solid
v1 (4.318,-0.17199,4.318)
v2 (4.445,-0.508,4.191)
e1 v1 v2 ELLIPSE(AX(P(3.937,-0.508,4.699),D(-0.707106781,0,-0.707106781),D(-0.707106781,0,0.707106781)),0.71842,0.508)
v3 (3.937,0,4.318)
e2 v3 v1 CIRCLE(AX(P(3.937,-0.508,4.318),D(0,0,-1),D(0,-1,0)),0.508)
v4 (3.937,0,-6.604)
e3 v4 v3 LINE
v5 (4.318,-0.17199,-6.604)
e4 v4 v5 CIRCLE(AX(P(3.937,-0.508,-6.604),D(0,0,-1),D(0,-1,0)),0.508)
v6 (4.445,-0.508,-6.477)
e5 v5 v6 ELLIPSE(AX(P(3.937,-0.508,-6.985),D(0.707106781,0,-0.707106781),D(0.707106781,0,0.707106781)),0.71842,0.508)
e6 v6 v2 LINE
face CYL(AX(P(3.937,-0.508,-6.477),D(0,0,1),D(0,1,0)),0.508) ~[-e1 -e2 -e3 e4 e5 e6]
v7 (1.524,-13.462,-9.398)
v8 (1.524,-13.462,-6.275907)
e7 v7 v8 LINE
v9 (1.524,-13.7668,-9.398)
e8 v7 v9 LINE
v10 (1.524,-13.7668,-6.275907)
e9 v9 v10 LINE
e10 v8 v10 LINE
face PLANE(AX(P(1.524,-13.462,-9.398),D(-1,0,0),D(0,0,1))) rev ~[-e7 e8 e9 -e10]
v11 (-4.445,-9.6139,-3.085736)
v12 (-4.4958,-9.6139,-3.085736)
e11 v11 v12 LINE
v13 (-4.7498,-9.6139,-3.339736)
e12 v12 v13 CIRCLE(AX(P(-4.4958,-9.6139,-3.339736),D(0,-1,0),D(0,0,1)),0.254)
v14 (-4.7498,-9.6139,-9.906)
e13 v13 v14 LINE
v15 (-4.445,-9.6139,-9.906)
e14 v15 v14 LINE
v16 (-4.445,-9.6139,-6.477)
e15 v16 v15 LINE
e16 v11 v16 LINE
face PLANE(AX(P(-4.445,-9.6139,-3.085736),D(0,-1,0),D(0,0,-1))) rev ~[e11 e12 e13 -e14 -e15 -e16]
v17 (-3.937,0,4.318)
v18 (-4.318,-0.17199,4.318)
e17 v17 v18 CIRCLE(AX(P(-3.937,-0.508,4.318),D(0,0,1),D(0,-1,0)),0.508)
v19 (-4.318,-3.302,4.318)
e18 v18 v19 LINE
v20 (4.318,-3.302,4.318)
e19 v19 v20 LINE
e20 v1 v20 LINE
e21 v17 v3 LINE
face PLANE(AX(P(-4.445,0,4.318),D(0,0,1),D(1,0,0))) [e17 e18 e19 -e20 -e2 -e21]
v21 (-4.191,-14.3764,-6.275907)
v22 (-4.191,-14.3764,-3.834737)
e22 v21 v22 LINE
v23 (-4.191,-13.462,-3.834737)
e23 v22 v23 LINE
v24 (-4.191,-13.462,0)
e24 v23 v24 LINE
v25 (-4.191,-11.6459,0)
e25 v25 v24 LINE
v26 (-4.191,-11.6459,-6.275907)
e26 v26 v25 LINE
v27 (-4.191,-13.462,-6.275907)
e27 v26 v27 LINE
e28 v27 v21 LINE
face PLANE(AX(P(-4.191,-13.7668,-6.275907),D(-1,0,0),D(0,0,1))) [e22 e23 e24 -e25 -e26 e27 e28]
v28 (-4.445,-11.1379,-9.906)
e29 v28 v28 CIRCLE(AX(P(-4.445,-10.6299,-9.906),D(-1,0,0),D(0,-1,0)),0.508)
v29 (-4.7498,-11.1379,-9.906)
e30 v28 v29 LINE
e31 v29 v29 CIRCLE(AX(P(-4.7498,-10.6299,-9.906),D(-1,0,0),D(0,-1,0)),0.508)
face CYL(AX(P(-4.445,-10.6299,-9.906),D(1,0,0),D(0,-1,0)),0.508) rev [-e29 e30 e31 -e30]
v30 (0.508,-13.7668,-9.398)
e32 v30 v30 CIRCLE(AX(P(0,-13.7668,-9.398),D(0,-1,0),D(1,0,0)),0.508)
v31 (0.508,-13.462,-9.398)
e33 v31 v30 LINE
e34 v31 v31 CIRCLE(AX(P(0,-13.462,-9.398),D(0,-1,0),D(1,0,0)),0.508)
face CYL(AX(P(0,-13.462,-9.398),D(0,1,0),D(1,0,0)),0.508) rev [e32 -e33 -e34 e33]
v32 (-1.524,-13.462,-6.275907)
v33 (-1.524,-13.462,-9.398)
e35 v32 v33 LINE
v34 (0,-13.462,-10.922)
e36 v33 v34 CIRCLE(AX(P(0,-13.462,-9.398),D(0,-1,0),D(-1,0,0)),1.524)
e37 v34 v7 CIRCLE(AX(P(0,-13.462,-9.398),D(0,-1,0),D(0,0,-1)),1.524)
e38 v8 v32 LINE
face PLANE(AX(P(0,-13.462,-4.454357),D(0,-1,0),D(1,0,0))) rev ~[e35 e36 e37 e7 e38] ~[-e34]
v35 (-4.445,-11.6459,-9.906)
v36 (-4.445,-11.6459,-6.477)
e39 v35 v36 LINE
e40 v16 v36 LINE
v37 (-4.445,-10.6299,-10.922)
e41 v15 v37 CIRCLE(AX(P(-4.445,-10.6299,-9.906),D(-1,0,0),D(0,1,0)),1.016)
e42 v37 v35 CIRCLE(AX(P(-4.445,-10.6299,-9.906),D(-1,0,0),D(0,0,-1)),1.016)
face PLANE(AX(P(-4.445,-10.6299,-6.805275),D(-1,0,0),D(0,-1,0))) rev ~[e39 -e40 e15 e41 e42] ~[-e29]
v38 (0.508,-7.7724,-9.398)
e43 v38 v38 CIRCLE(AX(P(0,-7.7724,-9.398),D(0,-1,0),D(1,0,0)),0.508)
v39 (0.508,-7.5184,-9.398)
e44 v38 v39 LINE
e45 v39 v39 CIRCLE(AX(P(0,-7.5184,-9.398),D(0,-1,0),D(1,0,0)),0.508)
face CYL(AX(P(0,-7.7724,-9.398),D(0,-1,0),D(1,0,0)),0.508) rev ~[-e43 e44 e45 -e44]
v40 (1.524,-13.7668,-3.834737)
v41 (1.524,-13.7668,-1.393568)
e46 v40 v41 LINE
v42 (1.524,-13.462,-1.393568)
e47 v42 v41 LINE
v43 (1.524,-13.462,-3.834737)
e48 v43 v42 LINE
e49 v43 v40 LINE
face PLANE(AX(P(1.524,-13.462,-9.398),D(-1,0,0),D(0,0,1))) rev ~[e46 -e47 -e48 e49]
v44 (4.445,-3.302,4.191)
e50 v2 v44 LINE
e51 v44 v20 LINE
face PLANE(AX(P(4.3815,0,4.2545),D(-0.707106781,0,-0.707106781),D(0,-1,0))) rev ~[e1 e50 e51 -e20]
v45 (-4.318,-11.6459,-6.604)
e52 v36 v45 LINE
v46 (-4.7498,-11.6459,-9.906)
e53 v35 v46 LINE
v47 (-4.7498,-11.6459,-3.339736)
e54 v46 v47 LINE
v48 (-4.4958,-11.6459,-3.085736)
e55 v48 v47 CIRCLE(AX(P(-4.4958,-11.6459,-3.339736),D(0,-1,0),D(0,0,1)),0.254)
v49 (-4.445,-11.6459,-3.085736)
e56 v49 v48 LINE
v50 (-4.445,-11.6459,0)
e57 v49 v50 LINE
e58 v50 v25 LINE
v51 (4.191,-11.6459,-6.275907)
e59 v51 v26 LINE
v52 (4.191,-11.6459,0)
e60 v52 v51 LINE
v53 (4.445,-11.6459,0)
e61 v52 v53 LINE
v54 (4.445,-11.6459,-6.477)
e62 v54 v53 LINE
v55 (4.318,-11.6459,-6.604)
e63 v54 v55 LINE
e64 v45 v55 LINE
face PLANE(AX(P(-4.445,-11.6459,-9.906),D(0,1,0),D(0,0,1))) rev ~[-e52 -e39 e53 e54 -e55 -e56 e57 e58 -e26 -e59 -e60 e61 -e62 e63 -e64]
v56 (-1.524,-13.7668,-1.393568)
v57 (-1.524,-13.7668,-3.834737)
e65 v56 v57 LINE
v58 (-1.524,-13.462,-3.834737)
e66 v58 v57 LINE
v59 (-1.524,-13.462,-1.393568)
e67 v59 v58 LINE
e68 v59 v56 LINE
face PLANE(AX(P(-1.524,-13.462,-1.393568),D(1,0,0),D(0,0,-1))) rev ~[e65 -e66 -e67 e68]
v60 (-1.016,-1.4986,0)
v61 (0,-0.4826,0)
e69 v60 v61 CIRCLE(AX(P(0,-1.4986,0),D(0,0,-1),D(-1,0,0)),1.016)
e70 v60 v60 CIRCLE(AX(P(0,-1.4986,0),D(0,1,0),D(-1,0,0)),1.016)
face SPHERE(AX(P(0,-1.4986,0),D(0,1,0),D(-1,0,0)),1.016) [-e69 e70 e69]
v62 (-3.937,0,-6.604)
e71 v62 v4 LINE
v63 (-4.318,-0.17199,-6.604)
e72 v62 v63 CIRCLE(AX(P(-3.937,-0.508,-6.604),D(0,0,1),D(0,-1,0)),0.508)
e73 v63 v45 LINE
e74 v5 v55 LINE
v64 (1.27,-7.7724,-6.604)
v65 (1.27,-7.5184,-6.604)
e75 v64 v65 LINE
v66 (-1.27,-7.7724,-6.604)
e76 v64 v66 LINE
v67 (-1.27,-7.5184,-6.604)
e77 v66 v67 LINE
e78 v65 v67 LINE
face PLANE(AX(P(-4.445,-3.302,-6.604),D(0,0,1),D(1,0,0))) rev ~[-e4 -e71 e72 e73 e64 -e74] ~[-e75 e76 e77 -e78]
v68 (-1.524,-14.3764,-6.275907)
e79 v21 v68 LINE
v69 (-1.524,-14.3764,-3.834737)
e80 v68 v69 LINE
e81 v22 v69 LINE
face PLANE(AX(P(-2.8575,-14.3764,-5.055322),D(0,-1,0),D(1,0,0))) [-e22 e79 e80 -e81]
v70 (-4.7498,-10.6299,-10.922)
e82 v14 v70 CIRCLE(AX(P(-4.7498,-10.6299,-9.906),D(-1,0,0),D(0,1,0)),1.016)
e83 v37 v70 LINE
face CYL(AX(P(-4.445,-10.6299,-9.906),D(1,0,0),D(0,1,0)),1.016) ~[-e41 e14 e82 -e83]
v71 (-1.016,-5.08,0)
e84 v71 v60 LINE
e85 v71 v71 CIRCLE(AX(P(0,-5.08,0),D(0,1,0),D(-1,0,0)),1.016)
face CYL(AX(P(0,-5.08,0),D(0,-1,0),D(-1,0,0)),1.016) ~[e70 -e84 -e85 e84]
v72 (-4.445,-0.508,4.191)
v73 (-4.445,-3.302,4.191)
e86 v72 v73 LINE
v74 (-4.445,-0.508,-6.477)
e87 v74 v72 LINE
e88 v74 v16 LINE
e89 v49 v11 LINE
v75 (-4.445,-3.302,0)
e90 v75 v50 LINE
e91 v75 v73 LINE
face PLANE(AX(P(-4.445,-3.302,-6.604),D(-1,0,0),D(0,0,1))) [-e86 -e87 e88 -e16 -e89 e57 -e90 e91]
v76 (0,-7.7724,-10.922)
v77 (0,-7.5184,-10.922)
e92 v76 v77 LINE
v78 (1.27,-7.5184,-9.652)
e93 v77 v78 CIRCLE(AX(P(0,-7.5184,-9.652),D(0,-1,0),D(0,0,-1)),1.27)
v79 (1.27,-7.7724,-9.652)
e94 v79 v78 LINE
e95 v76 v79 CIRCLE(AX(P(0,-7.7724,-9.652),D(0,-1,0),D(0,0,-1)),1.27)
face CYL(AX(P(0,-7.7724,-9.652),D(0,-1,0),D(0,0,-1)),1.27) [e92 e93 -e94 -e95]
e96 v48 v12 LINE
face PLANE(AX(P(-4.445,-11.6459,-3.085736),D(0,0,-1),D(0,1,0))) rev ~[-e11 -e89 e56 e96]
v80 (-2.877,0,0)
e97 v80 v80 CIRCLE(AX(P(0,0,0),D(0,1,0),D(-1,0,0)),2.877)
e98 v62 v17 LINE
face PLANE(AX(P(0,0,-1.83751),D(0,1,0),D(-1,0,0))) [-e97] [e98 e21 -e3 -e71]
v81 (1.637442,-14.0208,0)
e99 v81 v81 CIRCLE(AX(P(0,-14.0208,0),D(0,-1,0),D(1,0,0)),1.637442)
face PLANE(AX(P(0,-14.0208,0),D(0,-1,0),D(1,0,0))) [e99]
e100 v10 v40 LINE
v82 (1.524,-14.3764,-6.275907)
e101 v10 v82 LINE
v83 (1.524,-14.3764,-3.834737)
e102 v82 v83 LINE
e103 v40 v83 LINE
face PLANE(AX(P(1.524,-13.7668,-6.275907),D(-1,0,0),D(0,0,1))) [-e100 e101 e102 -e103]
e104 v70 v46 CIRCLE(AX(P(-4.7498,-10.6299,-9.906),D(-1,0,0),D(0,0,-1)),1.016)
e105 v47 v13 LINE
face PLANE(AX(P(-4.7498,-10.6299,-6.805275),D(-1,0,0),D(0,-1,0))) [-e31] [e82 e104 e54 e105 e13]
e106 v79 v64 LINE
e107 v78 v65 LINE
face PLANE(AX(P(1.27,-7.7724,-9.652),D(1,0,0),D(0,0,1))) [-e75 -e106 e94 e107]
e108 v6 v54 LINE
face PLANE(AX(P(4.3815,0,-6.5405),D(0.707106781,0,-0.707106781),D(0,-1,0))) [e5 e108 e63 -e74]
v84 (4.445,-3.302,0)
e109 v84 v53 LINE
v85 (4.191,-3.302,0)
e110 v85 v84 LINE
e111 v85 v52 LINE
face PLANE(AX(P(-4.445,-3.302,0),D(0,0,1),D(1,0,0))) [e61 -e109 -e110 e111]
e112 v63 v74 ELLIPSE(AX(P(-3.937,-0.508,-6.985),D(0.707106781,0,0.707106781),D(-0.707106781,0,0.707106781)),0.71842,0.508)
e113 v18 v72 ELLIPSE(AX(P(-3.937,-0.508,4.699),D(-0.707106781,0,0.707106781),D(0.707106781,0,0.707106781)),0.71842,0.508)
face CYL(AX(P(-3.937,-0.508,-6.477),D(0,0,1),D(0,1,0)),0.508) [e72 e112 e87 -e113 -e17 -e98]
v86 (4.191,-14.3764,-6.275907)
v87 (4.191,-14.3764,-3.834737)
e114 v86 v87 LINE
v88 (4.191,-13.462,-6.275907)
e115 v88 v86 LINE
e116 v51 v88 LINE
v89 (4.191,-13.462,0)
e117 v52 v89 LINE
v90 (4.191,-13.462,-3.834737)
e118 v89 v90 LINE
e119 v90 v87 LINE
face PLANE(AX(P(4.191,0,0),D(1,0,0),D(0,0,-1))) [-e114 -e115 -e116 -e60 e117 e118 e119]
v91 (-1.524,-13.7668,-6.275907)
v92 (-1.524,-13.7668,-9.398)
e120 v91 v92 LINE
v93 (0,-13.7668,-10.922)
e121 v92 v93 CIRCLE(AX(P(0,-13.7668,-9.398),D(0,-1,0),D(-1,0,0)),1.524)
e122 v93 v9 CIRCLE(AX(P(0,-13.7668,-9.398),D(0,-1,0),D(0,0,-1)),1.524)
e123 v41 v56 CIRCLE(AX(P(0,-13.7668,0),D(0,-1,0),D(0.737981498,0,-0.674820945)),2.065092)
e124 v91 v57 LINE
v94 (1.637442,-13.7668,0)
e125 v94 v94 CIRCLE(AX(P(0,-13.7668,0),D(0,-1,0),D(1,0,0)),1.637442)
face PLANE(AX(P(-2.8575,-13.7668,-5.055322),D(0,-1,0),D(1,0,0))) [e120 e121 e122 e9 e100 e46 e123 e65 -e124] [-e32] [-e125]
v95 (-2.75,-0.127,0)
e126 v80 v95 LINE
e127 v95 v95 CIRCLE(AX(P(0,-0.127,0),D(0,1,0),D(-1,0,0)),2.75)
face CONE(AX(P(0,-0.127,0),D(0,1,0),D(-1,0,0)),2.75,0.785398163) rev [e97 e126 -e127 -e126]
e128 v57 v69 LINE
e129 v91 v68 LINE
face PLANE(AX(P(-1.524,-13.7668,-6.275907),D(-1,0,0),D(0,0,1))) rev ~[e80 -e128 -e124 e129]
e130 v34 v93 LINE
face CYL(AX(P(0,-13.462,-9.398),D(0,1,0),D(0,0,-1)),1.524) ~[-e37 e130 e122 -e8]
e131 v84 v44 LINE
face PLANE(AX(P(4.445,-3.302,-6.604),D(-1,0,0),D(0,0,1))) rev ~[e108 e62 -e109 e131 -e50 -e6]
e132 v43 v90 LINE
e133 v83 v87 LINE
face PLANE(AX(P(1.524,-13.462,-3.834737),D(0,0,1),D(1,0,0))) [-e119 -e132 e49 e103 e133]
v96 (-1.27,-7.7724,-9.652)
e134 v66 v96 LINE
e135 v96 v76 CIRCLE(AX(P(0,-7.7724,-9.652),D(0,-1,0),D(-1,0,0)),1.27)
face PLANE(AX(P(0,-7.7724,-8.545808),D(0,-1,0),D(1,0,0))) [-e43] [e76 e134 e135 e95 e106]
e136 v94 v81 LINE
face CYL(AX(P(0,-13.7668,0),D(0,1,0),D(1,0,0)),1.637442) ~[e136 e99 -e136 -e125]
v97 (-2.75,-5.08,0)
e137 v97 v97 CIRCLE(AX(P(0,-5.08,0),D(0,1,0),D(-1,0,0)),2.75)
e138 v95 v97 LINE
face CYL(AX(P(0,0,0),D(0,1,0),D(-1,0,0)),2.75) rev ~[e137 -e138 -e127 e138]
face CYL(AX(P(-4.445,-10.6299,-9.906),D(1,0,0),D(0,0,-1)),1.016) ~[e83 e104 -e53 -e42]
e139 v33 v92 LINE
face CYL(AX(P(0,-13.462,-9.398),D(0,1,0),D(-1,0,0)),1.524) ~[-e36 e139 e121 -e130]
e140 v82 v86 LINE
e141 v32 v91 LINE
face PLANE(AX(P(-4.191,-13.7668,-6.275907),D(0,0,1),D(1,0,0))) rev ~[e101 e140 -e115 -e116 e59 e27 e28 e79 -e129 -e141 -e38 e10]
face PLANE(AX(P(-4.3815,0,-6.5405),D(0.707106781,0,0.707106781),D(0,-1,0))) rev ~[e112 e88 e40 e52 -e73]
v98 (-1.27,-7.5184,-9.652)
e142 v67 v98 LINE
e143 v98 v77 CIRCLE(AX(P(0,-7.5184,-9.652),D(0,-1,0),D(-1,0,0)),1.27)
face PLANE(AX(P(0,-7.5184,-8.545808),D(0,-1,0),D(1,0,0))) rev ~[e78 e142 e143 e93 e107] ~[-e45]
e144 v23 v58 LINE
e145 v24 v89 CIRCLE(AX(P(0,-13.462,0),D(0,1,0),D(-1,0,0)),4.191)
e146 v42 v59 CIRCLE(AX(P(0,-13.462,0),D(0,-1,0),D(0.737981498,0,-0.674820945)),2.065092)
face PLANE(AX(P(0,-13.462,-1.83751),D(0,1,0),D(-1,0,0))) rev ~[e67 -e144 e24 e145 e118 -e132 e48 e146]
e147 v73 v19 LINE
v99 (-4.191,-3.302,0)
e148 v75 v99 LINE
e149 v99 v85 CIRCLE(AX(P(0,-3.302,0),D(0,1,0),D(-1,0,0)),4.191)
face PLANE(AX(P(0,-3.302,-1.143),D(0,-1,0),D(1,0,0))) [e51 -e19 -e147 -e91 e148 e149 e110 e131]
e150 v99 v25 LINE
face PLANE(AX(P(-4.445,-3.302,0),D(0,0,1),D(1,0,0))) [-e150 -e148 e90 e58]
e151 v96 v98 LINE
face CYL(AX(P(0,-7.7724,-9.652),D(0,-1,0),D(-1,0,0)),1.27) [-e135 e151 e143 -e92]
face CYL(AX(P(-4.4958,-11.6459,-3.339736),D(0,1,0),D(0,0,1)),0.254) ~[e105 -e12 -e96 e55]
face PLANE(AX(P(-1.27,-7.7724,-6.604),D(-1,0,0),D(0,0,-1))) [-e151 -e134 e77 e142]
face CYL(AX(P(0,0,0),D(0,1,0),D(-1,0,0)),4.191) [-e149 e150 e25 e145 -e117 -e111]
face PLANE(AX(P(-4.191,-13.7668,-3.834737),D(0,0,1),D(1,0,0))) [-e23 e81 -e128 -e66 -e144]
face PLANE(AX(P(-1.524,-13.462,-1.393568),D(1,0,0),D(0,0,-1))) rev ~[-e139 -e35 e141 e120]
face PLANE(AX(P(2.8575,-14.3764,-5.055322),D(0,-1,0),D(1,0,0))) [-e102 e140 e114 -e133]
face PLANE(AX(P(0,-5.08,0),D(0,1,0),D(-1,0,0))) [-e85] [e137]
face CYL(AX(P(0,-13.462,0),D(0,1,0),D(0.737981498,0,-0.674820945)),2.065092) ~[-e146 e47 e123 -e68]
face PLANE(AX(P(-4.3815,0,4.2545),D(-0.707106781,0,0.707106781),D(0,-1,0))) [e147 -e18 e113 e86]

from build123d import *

# Parameters (mm, degrees)
F0_W      = 8.89
F0_H      = 10.922
F1_DEPTH  = 3.302
F3_DEPTH  = 13.462
F4_R      = 0.508
F4_R_2    = 1.6374420612
F5_DEPTH  = 0.3048
F6_R      = 1.6374420612
F7_DEPTH  = 0.254
F8_W      = 8.89
F8_H      = 6.604
F9_DEPTH  = 8.3439
F10_W     = 2.667
F10_H     = 2.4411697693
F11_DEPTH = 0.3048
F12_W     = 2.667
F12_H     = 2.4411697693
F13_DEPTH = 0.6096
F14_R     = 2.75
F15_DEPTH = 5.08
F16_SIZE  = 0.127
F18_R     = 0.508
F19_DEPTH = 0.254
F20_R     = 0.508
F21_DEPTH = 0.3048
F22_R     = 0.254
F23_R     = 1.016
F24_DEPTH = 4.5974
F25_R     = 1.016
F26_R     = 0.508


with BuildPart() as f1:
    # F0 (on Front) → F1 (new body)
    with BuildSketch(Plane.XZ):
        with Locations((0, -1.143)):
            Rectangle(F0_W, F0_H)
    extrude(amount=F1_DEPTH)

    # F2 (on face) → F3 (join)
    with BuildSketch(Plane(origin=(0, 0, 0), x_dir=(-1, 0, 0), z_dir=(0, 1, 0))):
        with BuildLine():
            ThreePointArc((4.191, 0), (0, 4.191), (-4.191, 0))
            Line((-4.191, 0), (-4.191, -6.2759071589))
            Line((-4.191, -6.2759071589), (4.191, -6.2759071589))
            Line((4.191, -6.2759071589), (4.191, 0))
        make_face()
    extrude(amount=-F3_DEPTH)

    # F4 (on face) → F5 (join)
    with BuildSketch(Plane.XZ.offset(13.462)):
        with BuildLine():
            Line((1.524, -9.398), (1.524, -1.3935676202))
            ThreePointArc((1.524, -1.3935676202), (0, 2.0650924222), (-1.524, -1.3935676202))
            Line((-1.524, -1.3935676202), (-1.524, -9.398))
            ThreePointArc((-1.524, -9.398), (-1.0776307345, -10.4756307345), (0, -10.922))
            ThreePointArc((0, -10.922), (1.0776307345, -10.4756307345), (1.524, -9.398))
        make_face()
        with Locations((0, -9.398)):
            Circle(F4_R, mode=Mode.SUBTRACT)
        Circle(F4_R_2, mode=Mode.SUBTRACT)
        Circle(F4_R_2)
    extrude(amount=F5_DEPTH)

    # F6 (on face) → F7 (join)
    with BuildSketch(Plane.XZ.offset(13.7668)):
        Circle(F6_R)
    extrude(amount=F7_DEPTH)

    # F8 (on face) → F9 (join)
    with BuildSketch(Plane.XZ.offset(3.302)):
        with Locations((0, -3.302)):
            Rectangle(F8_W, F8_H)
    extrude(amount=F9_DEPTH)

    # F10 (on face) → F11 (join, through all)
    with BuildSketch(Plane.XZ.offset(13.462)):
        with Locations((-2.8575, -5.0553222742)):
            Rectangle(F10_W, F10_H)
        with Locations((2.8575, -5.0553222742)):
            Rectangle(F10_W, F10_H)
    extrude(amount=F11_DEPTH)

    # F12 (on face) → F13 (join)
    with BuildSketch(Plane.XZ.offset(13.7668)):
        with Locations((-2.8575, -5.0553222742)):
            Rectangle(F12_W, F12_H)
        with Locations((2.8575, -5.0553222742)):
            Rectangle(F12_W, F12_H)
    extrude(amount=F13_DEPTH)

    # F14 (on face) → F15 (cut)
    with BuildSketch(Plane(origin=(0, 0, 0), x_dir=(-1, 0, 0), z_dir=(0, 1, 0))):
        Circle(F14_R)
    extrude(amount=-F15_DEPTH, mode=Mode.SUBTRACT)

    # F16
    f16_edges = [f1.edges().sort_by_distance(p)[0] for p in [
        (-4.445, -1.651, 4.318),
        (4.445, -1.651, 4.318),
        (4.445, -5.82295, -6.604),
        (-4.445, -5.82295, -6.604),
        (2.75, 0, 0),
    ]]
    chamfer(f16_edges, length=F16_SIZE)

    # F18 (on offset) → F19 (join)
    with BuildSketch(Plane.XZ.offset(7.7724)):
        with BuildLine():
            Line((1.27, -6.604), (-1.27, -6.604))
            Line((-1.27, -6.604), (-1.27, -9.652))
            ThreePointArc((-1.27, -9.652), (-0.8980256121, -10.5500256121), (0, -10.922))
            ThreePointArc((0, -10.922), (0.8980256121, -10.5500256121), (1.27, -9.652))
            Line((1.27, -9.652), (1.27, -6.604))
        make_face()
        with Locations((0, -9.398)):
            Circle(F18_R, mode=Mode.SUBTRACT)
    extrude(amount=-F19_DEPTH)

    # F20 (on face) → F21 (join)
    with BuildSketch(Plane(origin=(-4.445, 0, 0), x_dir=(0, -1, 0), z_dir=(-1, 0, 0))):
        with BuildLine():
            Line((11.6459, -3.0857360969), (9.6139, -3.0857360969))
            Line((9.6139, -3.0857360969), (9.6139, -9.906))
            ThreePointArc((9.6139, -9.906), (9.9114795103, -10.6244204897), (10.6299, -10.922))
            ThreePointArc((10.6299, -10.922), (11.3483204897, -10.6244204897), (11.6459, -9.906))
            Line((11.6459, -9.906), (11.6459, -3.0857360969))
        make_face()
        with Locations((10.6299, -9.906)):
            Circle(F20_R, mode=Mode.SUBTRACT)
    extrude(amount=F21_DEPTH)

    # F22
    f22_edges = [f1.edges().sort_by_distance(p)[0] for p in [
        (-4.7498, -10.6299, -3.085736),
    ]]
    fillet(f22_edges, radius=F22_R)

    # F23 (on face) → F24 (join)
    with BuildSketch(Plane(origin=(0, -5.08, 0), x_dir=(-1, 0, 0), z_dir=(0, 1, 0))):
        Circle(F23_R)
    extrude(amount=F24_DEPTH)

    # F25
    f25_edges = [f1.edges().sort_by_distance(p)[0] for p in [
        (1.016, -0.4826, 0),
    ]]
    fillet(f25_edges, radius=F25_R)

    # F26
    f26_edges = [f1.edges().sort_by_distance(p)[0] for p in [
        (-4.445, 0, -1.143),
        (4.445, 0, -1.143),
    ]]
    fillet(f26_edges, radius=F26_R)


solid = f1.part
